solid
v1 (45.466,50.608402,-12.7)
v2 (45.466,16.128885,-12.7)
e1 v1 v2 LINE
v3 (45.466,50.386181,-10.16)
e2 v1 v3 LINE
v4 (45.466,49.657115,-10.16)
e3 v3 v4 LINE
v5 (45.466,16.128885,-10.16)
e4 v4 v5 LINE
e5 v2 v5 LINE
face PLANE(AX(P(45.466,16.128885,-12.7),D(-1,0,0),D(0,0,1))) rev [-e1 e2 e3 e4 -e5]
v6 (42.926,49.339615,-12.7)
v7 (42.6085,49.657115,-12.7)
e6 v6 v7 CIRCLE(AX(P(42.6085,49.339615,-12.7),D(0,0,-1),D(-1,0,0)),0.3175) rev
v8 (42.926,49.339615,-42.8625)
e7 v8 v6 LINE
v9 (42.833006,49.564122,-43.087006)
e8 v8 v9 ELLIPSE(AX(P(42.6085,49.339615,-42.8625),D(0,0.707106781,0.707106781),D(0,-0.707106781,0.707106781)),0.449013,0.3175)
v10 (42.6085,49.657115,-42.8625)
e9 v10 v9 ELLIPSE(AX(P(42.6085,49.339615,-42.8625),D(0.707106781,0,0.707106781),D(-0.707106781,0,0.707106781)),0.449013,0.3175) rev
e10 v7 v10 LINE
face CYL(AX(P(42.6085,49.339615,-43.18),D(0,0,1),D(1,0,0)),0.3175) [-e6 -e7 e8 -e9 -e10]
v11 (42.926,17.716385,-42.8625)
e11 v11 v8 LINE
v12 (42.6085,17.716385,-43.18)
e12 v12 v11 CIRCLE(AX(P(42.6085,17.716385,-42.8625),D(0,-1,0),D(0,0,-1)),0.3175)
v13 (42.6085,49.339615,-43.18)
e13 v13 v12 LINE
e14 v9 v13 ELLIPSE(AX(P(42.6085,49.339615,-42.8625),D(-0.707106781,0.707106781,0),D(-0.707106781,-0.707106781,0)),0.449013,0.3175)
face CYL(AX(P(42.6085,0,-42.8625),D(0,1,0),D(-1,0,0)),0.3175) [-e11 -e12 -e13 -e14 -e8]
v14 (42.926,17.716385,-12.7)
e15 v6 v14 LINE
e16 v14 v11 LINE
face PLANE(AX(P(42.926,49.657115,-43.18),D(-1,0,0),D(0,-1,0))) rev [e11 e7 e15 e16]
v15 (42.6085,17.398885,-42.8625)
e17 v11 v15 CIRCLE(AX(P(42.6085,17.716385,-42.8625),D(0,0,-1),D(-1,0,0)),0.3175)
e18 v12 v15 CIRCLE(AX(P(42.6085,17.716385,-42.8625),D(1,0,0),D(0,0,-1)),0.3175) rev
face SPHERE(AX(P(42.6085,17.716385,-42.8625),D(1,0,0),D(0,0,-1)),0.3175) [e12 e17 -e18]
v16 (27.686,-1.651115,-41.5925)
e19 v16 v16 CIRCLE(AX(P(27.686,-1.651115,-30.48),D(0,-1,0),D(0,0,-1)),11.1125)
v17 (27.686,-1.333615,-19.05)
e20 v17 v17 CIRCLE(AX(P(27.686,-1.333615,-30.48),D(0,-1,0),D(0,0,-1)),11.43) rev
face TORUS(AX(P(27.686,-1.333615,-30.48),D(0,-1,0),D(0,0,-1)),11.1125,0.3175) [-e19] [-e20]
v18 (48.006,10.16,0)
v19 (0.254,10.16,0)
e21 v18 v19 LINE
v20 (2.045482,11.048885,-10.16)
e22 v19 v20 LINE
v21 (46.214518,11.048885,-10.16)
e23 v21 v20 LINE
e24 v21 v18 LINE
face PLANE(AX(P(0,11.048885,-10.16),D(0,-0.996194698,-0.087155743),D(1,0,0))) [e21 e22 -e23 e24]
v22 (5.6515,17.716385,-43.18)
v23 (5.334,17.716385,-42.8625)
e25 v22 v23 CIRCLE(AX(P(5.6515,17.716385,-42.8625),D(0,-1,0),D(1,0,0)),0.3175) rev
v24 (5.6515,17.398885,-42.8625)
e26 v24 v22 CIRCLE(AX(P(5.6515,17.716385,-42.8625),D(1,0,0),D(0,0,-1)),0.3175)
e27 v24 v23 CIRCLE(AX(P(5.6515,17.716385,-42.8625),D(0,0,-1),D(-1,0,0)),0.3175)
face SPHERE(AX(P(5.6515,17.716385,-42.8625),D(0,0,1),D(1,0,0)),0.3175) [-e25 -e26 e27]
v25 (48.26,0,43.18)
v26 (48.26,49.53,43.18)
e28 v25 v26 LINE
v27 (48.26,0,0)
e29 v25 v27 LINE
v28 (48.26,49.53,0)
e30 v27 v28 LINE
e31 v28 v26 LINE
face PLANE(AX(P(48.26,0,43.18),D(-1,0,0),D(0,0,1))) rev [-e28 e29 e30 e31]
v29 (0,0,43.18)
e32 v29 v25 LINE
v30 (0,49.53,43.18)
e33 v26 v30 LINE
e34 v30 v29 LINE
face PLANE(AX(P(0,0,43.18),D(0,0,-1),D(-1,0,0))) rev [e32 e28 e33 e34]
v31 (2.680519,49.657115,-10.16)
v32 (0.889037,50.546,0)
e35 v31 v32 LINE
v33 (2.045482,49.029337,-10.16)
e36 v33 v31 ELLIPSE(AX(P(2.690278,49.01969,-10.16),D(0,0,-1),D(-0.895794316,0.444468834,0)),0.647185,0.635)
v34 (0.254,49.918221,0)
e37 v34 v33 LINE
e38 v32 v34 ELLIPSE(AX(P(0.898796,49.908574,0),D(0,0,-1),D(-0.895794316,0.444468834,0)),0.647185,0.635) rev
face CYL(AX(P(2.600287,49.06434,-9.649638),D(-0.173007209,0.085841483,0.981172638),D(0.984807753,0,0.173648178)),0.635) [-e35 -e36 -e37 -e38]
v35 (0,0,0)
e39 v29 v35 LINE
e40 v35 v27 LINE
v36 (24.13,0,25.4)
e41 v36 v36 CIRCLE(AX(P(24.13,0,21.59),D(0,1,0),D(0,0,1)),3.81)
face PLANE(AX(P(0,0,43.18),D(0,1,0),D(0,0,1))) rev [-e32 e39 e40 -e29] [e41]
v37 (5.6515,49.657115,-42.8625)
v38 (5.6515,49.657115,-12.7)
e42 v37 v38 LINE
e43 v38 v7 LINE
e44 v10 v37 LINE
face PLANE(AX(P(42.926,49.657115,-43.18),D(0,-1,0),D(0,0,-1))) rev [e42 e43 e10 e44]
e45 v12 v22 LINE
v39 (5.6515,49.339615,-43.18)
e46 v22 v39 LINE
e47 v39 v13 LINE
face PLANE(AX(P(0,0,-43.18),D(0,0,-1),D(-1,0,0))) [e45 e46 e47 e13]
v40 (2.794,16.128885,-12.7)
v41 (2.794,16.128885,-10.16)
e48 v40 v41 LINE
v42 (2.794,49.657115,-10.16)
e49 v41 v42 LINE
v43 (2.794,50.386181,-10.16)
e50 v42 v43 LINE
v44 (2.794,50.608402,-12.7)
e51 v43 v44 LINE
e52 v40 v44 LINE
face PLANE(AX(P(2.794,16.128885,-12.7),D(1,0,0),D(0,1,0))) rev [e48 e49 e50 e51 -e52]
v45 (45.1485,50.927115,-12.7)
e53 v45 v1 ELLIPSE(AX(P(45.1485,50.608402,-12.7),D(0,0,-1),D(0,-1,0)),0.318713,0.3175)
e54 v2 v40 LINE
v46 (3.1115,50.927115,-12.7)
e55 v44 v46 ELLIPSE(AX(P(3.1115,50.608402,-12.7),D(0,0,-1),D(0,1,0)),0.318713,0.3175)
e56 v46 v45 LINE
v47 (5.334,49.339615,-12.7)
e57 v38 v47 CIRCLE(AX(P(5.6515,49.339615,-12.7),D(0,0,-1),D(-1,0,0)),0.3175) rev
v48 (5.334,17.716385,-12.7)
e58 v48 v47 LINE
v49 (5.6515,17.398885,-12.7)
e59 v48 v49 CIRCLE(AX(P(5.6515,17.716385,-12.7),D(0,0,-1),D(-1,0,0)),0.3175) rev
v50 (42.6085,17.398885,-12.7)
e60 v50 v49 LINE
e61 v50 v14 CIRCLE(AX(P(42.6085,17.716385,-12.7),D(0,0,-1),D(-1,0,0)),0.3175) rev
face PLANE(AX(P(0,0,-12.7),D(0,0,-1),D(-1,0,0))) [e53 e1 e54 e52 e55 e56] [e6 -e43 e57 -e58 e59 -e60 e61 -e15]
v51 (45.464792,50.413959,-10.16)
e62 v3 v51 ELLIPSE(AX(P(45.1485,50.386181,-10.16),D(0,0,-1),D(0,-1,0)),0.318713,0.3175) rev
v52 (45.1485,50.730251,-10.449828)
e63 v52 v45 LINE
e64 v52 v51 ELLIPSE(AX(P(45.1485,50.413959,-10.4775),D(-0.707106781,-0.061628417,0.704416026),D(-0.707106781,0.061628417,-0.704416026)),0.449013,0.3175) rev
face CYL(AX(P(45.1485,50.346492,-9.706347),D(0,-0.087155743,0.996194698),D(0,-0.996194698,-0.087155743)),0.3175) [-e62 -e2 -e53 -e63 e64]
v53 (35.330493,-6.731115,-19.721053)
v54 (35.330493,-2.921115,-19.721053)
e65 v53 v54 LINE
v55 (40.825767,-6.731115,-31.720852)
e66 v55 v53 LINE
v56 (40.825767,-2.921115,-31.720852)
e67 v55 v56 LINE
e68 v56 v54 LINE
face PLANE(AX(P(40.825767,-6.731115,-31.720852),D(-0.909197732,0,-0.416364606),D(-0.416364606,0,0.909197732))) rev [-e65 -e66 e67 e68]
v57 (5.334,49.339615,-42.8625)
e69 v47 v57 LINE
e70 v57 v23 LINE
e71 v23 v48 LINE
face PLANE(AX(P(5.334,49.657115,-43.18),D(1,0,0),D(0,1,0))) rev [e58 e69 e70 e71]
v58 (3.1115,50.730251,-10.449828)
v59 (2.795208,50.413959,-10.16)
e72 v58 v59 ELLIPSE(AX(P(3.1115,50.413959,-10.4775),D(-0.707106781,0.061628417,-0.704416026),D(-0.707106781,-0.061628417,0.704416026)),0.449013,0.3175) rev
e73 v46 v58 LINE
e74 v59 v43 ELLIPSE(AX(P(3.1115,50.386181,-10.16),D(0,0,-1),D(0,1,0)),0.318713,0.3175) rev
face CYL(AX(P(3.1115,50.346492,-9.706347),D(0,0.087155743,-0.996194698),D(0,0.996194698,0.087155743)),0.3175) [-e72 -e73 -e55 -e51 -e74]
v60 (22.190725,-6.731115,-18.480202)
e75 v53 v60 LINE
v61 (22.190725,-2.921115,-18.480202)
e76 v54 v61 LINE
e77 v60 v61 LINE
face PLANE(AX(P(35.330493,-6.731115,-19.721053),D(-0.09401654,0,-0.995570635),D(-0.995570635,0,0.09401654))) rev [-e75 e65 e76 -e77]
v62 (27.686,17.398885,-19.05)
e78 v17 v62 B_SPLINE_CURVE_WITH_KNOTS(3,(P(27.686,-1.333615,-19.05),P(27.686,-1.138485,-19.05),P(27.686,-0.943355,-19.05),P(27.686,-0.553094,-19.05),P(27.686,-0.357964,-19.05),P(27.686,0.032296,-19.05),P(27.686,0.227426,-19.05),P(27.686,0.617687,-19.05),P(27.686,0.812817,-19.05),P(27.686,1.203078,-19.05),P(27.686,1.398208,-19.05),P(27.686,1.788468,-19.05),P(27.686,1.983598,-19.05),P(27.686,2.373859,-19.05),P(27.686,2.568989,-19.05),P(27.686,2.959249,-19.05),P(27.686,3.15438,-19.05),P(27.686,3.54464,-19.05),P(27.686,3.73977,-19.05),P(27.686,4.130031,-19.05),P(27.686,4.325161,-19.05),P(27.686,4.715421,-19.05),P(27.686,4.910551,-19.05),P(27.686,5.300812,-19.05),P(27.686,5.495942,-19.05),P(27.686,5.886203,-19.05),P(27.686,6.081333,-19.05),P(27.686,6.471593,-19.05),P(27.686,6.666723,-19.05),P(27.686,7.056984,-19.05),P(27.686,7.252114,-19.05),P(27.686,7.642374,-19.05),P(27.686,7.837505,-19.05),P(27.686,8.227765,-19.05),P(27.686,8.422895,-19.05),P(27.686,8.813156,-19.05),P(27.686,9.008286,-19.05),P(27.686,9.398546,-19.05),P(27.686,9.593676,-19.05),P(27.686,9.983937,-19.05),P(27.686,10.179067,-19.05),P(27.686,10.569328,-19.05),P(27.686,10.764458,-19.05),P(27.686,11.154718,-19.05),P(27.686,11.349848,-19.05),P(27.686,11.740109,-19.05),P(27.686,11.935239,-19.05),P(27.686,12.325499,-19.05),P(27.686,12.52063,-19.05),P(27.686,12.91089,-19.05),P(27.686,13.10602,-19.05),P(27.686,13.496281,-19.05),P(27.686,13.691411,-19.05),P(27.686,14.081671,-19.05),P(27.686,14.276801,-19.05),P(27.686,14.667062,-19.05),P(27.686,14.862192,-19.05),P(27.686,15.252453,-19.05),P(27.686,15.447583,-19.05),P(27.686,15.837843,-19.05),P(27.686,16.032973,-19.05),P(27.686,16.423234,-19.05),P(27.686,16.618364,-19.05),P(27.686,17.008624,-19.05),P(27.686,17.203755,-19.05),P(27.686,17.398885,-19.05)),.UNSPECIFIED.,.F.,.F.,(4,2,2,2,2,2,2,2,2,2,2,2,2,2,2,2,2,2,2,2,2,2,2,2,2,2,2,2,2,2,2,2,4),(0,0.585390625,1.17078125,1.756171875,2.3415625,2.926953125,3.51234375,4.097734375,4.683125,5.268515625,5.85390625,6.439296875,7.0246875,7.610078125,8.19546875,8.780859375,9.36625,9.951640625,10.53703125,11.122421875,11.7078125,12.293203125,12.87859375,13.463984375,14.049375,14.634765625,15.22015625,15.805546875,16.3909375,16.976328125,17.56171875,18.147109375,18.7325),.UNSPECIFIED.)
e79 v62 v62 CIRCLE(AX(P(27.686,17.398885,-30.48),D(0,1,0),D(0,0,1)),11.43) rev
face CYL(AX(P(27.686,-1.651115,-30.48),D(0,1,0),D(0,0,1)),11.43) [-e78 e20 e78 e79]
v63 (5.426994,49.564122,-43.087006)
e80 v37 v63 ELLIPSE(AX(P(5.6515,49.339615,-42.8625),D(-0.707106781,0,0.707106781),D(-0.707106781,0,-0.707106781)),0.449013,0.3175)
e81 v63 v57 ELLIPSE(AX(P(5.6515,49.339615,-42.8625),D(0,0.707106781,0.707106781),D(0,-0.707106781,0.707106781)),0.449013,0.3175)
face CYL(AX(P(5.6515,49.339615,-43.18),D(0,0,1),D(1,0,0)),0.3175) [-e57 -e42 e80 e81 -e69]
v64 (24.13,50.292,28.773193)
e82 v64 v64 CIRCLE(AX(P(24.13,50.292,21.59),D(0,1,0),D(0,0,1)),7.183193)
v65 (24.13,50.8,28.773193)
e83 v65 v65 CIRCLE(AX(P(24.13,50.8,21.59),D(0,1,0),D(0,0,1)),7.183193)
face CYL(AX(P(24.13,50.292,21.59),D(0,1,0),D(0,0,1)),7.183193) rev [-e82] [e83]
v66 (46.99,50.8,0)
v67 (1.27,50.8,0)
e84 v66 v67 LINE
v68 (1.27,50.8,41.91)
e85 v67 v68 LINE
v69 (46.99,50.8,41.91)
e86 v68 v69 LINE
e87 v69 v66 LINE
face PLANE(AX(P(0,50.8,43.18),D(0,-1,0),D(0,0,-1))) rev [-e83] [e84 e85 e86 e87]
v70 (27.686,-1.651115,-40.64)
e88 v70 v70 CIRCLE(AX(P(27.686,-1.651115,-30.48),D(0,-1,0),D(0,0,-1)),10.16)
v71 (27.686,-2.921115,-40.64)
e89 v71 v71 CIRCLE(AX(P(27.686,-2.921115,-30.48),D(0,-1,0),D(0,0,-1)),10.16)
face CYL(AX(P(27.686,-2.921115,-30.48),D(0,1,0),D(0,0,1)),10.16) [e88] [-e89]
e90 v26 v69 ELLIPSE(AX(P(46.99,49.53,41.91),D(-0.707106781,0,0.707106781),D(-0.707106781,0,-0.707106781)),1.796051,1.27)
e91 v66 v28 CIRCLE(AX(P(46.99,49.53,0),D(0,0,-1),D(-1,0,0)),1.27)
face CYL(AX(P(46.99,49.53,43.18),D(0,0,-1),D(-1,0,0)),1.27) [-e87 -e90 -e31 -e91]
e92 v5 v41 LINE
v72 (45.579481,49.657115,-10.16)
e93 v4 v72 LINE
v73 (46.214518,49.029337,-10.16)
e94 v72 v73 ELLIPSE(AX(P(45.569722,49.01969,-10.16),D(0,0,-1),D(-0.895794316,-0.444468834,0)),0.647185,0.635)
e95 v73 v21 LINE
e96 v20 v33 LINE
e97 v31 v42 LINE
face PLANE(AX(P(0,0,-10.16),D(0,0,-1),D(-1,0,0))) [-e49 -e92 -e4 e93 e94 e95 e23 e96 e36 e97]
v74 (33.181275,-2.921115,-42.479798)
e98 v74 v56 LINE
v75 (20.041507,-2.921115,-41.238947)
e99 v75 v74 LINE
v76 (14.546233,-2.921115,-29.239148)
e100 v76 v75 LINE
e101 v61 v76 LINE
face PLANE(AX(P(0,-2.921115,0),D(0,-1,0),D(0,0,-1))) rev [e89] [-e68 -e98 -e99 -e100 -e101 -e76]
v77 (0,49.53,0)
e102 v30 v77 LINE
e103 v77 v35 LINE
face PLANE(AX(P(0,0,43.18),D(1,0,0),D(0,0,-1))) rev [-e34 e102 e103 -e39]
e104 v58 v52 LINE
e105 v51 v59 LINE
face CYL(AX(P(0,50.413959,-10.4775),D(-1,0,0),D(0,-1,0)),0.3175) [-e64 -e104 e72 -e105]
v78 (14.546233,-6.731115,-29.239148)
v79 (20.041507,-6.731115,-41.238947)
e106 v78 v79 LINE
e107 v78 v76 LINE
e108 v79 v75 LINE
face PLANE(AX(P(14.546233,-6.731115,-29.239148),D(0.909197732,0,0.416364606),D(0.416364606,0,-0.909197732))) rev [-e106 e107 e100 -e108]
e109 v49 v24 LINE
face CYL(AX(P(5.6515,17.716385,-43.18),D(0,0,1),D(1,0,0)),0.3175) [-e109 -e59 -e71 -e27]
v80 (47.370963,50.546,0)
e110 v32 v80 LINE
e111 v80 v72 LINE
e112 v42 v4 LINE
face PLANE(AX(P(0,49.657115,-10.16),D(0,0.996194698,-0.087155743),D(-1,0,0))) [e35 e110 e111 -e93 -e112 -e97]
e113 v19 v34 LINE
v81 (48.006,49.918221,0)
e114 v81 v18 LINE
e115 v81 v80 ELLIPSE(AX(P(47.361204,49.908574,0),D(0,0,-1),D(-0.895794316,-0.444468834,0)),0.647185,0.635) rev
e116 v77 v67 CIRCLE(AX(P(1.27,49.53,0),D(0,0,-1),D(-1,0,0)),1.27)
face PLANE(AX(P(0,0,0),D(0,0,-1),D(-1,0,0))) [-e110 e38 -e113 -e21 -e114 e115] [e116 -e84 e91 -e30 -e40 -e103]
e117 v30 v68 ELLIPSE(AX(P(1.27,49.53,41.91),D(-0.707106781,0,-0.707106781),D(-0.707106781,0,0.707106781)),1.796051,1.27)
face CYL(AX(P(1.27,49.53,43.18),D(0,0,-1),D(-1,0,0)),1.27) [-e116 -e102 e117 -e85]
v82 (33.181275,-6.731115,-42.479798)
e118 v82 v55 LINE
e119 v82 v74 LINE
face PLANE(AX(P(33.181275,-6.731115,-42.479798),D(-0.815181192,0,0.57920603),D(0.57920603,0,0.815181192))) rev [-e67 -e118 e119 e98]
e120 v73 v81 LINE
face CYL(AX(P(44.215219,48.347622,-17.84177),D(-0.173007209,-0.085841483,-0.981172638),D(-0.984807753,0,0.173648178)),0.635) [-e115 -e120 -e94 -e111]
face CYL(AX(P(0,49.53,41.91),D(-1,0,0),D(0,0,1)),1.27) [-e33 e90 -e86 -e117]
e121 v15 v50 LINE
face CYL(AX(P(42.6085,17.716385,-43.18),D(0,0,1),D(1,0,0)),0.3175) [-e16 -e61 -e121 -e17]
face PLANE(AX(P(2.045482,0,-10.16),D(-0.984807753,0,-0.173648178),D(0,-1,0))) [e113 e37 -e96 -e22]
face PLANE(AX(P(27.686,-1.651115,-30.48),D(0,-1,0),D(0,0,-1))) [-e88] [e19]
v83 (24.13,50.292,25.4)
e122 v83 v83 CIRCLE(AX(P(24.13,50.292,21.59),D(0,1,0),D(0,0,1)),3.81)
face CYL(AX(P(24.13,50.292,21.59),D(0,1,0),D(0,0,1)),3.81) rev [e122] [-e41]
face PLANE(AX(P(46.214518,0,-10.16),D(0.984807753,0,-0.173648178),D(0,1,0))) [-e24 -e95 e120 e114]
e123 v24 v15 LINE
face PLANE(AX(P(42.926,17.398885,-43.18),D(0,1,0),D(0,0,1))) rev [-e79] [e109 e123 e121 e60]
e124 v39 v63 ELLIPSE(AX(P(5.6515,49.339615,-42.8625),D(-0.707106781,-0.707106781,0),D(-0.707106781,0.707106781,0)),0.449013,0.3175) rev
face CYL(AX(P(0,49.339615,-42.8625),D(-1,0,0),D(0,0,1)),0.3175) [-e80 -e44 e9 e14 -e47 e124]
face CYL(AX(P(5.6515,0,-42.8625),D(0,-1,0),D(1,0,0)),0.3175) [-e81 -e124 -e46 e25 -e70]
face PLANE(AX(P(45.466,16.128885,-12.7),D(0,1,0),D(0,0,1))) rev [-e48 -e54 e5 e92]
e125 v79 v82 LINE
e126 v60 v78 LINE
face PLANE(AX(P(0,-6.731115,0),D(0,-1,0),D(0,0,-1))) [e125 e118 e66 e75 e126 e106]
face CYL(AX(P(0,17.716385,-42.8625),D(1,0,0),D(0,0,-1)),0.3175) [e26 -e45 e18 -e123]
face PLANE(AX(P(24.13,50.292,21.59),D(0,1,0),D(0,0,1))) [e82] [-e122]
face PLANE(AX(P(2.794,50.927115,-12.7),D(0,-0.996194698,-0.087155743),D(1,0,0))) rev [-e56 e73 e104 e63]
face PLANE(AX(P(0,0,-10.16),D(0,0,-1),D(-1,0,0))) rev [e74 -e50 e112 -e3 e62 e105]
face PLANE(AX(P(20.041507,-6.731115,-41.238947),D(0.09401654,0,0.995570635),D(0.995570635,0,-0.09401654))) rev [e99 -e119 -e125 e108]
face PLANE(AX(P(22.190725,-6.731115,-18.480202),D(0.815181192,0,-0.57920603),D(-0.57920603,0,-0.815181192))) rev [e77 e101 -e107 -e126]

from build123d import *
from OCP.BRepFilletAPI import BRepFilletAPI_MakeChamfer

# Parameters (mm, degrees)
SKETCH2_W                   = 48.26
SKETCH2_H                   = 50.8
BOSS_EXTRUDE1_DEPTH         = 43.18
FILLET1_R                   = 1.27
BOSS_EXTRUDE2_DEPTH         = 10.16
CHAMFER1_SIZE               = 10.16
CHAMFER1_SIZE_2             = 0.888884821
SKETCH4_R                   = 7.183192936
CUT_EXTRUDE1_DEPTH          = 0.508
CHAMFER4_SIZE               = 1.791482124
CHAMFER4_SIZE_2             = 10.16
SKETCH6_W                   = 42.672
SKETCH6_H                   = 34.798230358
BOSS_EXTRUDE3_DEPTH         = 2.54
CHAMFER2_SIZE2              = 2.54
CHAMFER2_SIZE               = 0.222221205
FILLET4_R                   = 0.3175
SKETCH8_W                   = 37.592
SKETCH8_H                   = 32.258230358
BOSS_EXTRUDE4_DEPTH         = 30.48
FILLET5_R                   = 0.3175
FILLET6_R                   = 0.3175
FILLET7_R                   = 0.3175
SKETCH10_R                  = 11.43
BOSS_EXTRUDE5_DEPTH         = 19.05
SKETCH11_R                  = 10.16
BOSS_EXTRUDE6_DEPTH         = 1.27
BOSS_EXTRUDE7_DEPTH         = 3.81
FILLET8_R                   = 0.3175
FILLET2_R                   = 0.635
F_3_64_0_3_DIAMETER_HOLE1_D = 7.62


# Some blends are built 0.0001 mm under size
with BuildPart() as part:
    # Sketch2 → Boss-Extrude1 (new body)
    with BuildSketch(Plane.XY):
        with Locations((24.13, 25.4)):
            Rectangle(SKETCH2_W, SKETCH2_H)
    extrude(amount=BOSS_EXTRUDE1_DEPTH)

    # Fillet1
    fillet1_edges = [part.edges().sort_by_distance(p)[0] for p in [
        (24.13, 50.8, 43.18),
        (0, 50.8, 21.59),
        (48.26, 50.8, 21.59),
    ]]
    fillet(fillet1_edges, radius=FILLET1_R)

    # Sketch3 → Boss-Extrude2 (add)
    with BuildSketch(Plane(origin=(0, 0, 0), x_dir=(-1, 0, 0), z_dir=(0, 0, -1))):
        Polygon((-45.466, 50.546), (-2.794, 50.546), (-0.254, 50.546), (-0.254, 48.006), (-0.254, 10.16), (-48.006, 10.16), (-48.006, 48.006), (-48.006, 50.546), align=None)
    extrude(amount=BOSS_EXTRUDE2_DEPTH)

    # Chamfer1
    chamfer1_edges_1 = [part.edges().sort_by_distance(p)[0] for p in [
        (24.13, 50.546, -10.16),
    ]]
    chamfer1_side_1 = [part.faces().sort_by_distance(p)[0] for p in [
        (24.13, 50.546, -10.142222304),
    ]]
    chamfer1_edges_2 = [part.edges().sort_by_distance(p)[0] for p in [
        (24.13, 10.16, -10.16),
    ]]
    chamfer1_side_2 = [part.faces().sort_by_distance(p)[0] for p in [
        (24.13, 10.16, -10.142222304),
    ]]
    chamfer1 = BRepFilletAPI_MakeChamfer(part.part.solid().wrapped)
    for e in chamfer1_edges_1:
        chamfer1.Add(CHAMFER1_SIZE - 0.0001, CHAMFER1_SIZE_2 - 0.0001, e.wrapped, chamfer1_side_1[0].wrapped)
    for e in chamfer1_edges_2:
        chamfer1.Add(CHAMFER1_SIZE - 0.0001, CHAMFER1_SIZE_2 - 0.0001, e.wrapped, chamfer1_side_2[0].wrapped)
    add(Compound.cast(chamfer1.Shape()), mode=Mode.REPLACE)  # a hair under: the kernel refuses the full size

    # Sketch4 → Cut-Extrude1 (cut)
    with BuildSketch(Plane(origin=(0, 50.8, 0), x_dir=(1, 0, 0), z_dir=(0, 1, 0))):
        with Locations(Location((24.13, -21.59, 0), (0, 0, 270))):
            Circle(SKETCH4_R)
    extrude(amount=-CUT_EXTRUDE1_DEPTH, mode=Mode.SUBTRACT)

    # Chamfer4
    chamfer4_edges_1 = [part.edges().sort_by_distance(p)[0] for p in [
        (48.006, 30.353, -10.16),
    ]]
    chamfer4_side_1 = [part.faces().sort_by_distance(p)[0] for p in [
        (47.970170358, 30.353, -10.16),
    ]]
    chamfer4_edges_2 = [part.edges().sort_by_distance(p)[0] for p in [
        (0.254, 30.353, -10.16),
    ]]
    chamfer4_side_2 = [part.faces().sort_by_distance(p)[0] for p in [
        (0.254, 30.353, -10.124170358),
    ]]
    chamfer4 = BRepFilletAPI_MakeChamfer(part.part.solid().wrapped)
    for e in chamfer4_edges_1:
        chamfer4.Add(CHAMFER4_SIZE - 0.0001, CHAMFER4_SIZE_2 - 0.0001, e.wrapped, chamfer4_side_1[0].wrapped)
    for e in chamfer4_edges_2:
        chamfer4.Add(CHAMFER4_SIZE_2 - 0.0001, CHAMFER4_SIZE - 0.0001, e.wrapped, chamfer4_side_2[0].wrapped)
    add(Compound.cast(chamfer4.Shape()), mode=Mode.REPLACE)  # a hair under: the kernel refuses the full size

    # Sketch6 → Boss-Extrude3 (add)
    with BuildSketch(Plane(origin=(0, 0, -10.16), x_dir=(-1, 0, 0), z_dir=(0, 0, -1))):
        with Locations((-24.13, 33.528)):
            Rectangle(SKETCH6_W, SKETCH6_H)
    extrude(amount=BOSS_EXTRUDE3_DEPTH)

    # Chamfer2
    chamfer2_edges = [part.edges().sort_by_distance(p)[0] for p in [
        (24.13, 50.927115179, -10.16),
    ]]
    chamfer2_side = [part.faces().sort_by_distance(p)[0] for p in [
        (24.13, 50.922670754, -10.16),
    ]]
    chamfer(chamfer2_edges, length=CHAMFER2_SIZE - 0.0001, length2=CHAMFER2_SIZE2 - 0.0001, reference=chamfer2_side[0])  # a hair under: the kernel refuses the full size

    # Fillet4
    # the kernel refuses this fillet: 0.3175 mm, written as the material it takes off along each edge
    with BuildSketch(Plane(origin=(45.466, 50.635842296, -9.369267992), x_dir=(-1, 0, 0), z_dir=(0, 0.08712022396653547, -0.9961978049443899)), Plane(origin=(2.794, 50.635842296, -9.369267992), x_dir=(0, -0.9961978049443899, -0.08712022396653547), z_dir=(0, 0.08712022396653547, -0.9961978049443899))) as fillet4_piece_1:
        with BuildLine():
            CenterArc((FILLET4_R, -FILLET4_R), FILLET4_R, 90, 90)
            Line((0, -FILLET4_R), (0, 0))
            Line((0, 0), (FILLET4_R, 0))
        make_face()
    extrude(amount=4.137094054, mode=Mode.SUBTRACT)
    with BuildSketch(Plane(origin=(46.193363902, 50.704993974, -10.16), x_dir=(0, -1, 0), z_dir=(-1, 0, 0))) as fillet4_piece_2:
        with BuildLine():
            CenterArc((FILLET4_R * 0.916363970592, -FILLET4_R), FILLET4_R, 90, 85.002042847)
            Line((-FILLET4_R * 0.0798338343528, -FILLET4_R * 0.912879776033), (0, 0))
            Line((0, 0), (FILLET4_R * 0.916363970592, 0))
        make_face()
    extrude(amount=44.126727803, mode=Mode.SUBTRACT)

    # Sketch8 → Boss-Extrude4 (add)
    with BuildSketch(Plane(origin=(0, 0, -12.7), x_dir=(-1, 0, 0), z_dir=(0, 0, -1))):
        with Locations((-24.13, 33.528)):
            Rectangle(SKETCH8_W, SKETCH8_H)
    extrude(amount=BOSS_EXTRUDE4_DEPTH)

    # Fillet5
    fillet5_edges = [part.edges().sort_by_distance(p)[0] for p in [
        (42.926, 49.657115179, -27.94),
        (5.334, 49.657115179, -27.94),
        (24.13, 49.657115179, -43.18),
    ]]
    fillet(fillet5_edges, radius=FILLET5_R)

    # Fillet6
    # the kernel refuses this fillet: 0.3175 mm, written as the material it takes off along each edge
    with BuildSketch(Plane(origin=(42.6085, 17.716384821, -42.8625), x_dir=(0, -1, 0), z_dir=(1, 0, 0))) as fillet6_piece_1_section:
        Polygon((0, 0), (FILLET6_R * 1.02, 0), (FILLET6_R * 1.02, FILLET6_R * 1.02), (0, FILLET6_R * 1.02), align=None)
    fillet6_piece_1 = extrude(amount=FILLET6_R * 1.02, mode=Mode.PRIVATE)
    fillet6_piece_1 = fillet6_piece_1 - Plane(origin=(42.6085, 17.716384821, -42.8625), x_dir=(0, 0.7071067811865475, 0.7071067811865475), z_dir=(1, 0, 0)) * Sphere(FILLET6_R, mode=Mode.PRIVATE)
    add(fillet6_piece_1, mode=Mode.SUBTRACT)
    with BuildSketch(Plane(origin=(42.926, 17.398884821, -12.7), x_dir=(0, 1, 0), z_dir=(0, 0, -1))) as fillet6_piece_2:
        with BuildLine():
            CenterArc((FILLET6_R, -FILLET6_R), FILLET6_R, 90, 90)
            Line((0, -FILLET6_R), (0, 0))
            Line((0, 0), (FILLET6_R, 0))
        make_face()
    extrude(amount=30.1625, mode=Mode.SUBTRACT)
    with BuildSketch(Plane(origin=(4.54025, 17.398884821, -43.18), x_dir=(0, 0, 1), z_dir=(1, 0, 0))) as fillet6_piece_3:
        with BuildLine():
            CenterArc((FILLET6_R, -FILLET6_R), FILLET6_R, 90, 90)
            Line((0, -FILLET6_R), (0, 0))
            Line((0, 0), (FILLET6_R, 0))
        make_face()
    extrude(amount=38.06825, mode=Mode.SUBTRACT)
    with BuildSketch(Plane(origin=(5.334, 50.133365179, -43.18), x_dir=(0, 0, 1), z_dir=(0, -1, 0))) as fillet6_piece_4:
        with BuildLine():
            CenterArc((FILLET6_R, -FILLET6_R), FILLET6_R, 90, 90)
            Line((0, -FILLET6_R), (0, 0))
            Line((0, 0), (FILLET6_R, 0))
        make_face()
    extrude(amount=33.528230357, mode=Mode.SUBTRACT)
    with BuildSketch(Plane(origin=(42.926, 17.716384821, -43.18), x_dir=(0, 0, 1), z_dir=(0, 1, 0))) as fillet6_piece_5:
        with BuildLine():
            CenterArc((FILLET6_R, -FILLET6_R), FILLET6_R, 90, 90)
            Line((0, -FILLET6_R), (0, 0))
            Line((0, 0), (FILLET6_R, 0))
        make_face()
    extrude(amount=32.416980357, mode=Mode.SUBTRACT)

    # Fillet7
    # the kernel refuses this fillet: 0.3175 mm, written as the material it takes off along each edge
    with BuildSketch(Plane(origin=(5.6515, 17.716384821, -42.8625), x_dir=(-1, 0, 0), z_dir=(0, -1, 0))) as fillet7_piece_1_section:
        Polygon((0, 0), (FILLET7_R, 0), (FILLET7_R, FILLET7_R), (0, FILLET7_R), align=None)
    fillet7_piece_1 = extrude(amount=FILLET7_R, mode=Mode.PRIVATE)
    fillet7_piece_1 = fillet7_piece_1 - Plane(origin=(5.6515, 17.716384821, -42.8625), x_dir=(0.7071067811865475, 0, 0.7071067811865475), z_dir=(0, -1, 0)) * Sphere(FILLET7_R, mode=Mode.PRIVATE)
    add(fillet7_piece_1, mode=Mode.SUBTRACT)
    with BuildSketch(Plane(origin=(5.334, 17.398884821, -12.7), x_dir=(1, 0, 0), z_dir=(0, 0, -1))) as fillet7_piece_2:
        with BuildLine():
            CenterArc((FILLET7_R, -FILLET7_R), FILLET7_R, 90, 90)
            Line((0, -FILLET7_R), (0, 0))
            Line((0, 0), (FILLET7_R, 0))
        make_face()
    extrude(amount=30.1625, mode=Mode.SUBTRACT)

    # Sketch10 → Boss-Extrude5 (add)
    with BuildSketch(Plane.XZ.offset(-17.398884821)):
        with Locations(Location((27.686, -30.48, 0), (0, 0, 90))):
            Circle(SKETCH10_R)
    extrude(amount=BOSS_EXTRUDE5_DEPTH)

    # Sketch11 → Boss-Extrude6 (add)
    with BuildSketch(Plane.XZ.offset(1.651115179)):
        with Locations(Location((27.686, -30.48, 0), (0, 0, 270))):
            Circle(SKETCH11_R)
    extrude(amount=BOSS_EXTRUDE6_DEPTH)

    # Sketch12 → Boss-Extrude7 (add)
    with BuildSketch(Plane.XZ.offset(2.921115179)):
        Polygon((33.181274645, -42.479798189), (40.825767394, -31.720851652), (35.33049275, -19.721053462), (22.190725355, -18.480201811), (14.546232606, -29.239148348), (20.04150725, -41.238946538), align=None)
    extrude(amount=BOSS_EXTRUDE7_DEPTH)

    # Fillet8
    fillet8_edges = [part.edges().sort_by_distance(p)[0] for p in [
        (27.686, -1.651115179, -41.91),
    ]]
    fillet(fillet8_edges, radius=FILLET8_R)

    # Fillet2
    # the kernel refuses this fillet: 0.635 mm, written as the material it takes off along each edge
    with BuildSketch(Plane(origin=(45.944105867, 49.523002068, -11.694220381), x_dir=(0.01490405395374314, -0.9963095509323676, 0.08452897666887954), z_dir=(0.17299962328390456, 0.08583285338927087, 0.9811747304240377))) as fillet2_piece_1_section:
        with BuildLine():
            CenterArc((FILLET2_R * 0.984980559667, -FILLET2_R), FILLET2_R, 90, 89.132954612)
            Line((-FILLET2_R * 0.0149049417488, -FILLET2_R * 0.984867780788), (0, 0))
            Line((0, 0), (FILLET2_R * 0.984980559667, 0))
        make_face()
    fillet2_piece_1 = extrude(amount=13.48214579, mode=Mode.PRIVATE)
    fillet2_piece_1 = split(fillet2_piece_1, bisect_by=Plane(origin=(46.959597239, 49.956662585, -10.16), z_dir=(0, 0, 1)), keep=Keep.TOP, mode=Mode.PRIVATE)
    fillet2_piece_1 = split(fillet2_piece_1, bisect_by=Plane(origin=(46.959597239, 49.956662585, 0), z_dir=(0, 0, -1)), keep=Keep.TOP, mode=Mode.PRIVATE)
    add(fillet2_piece_1, mode=Mode.SUBTRACT)
    with BuildSketch(Plane(origin=(-0.016512009, 50.680213111, 1.534120381), x_dir=(-0.014904053953745064, -0.9963095509323676, 0.0845289766688792), z_dir=(0.17299962328390434, -0.08583285338927088, -0.9811747304240378))) as fillet2_piece_2_section:
        with BuildLine():
            CenterArc((FILLET2_R * 0.984980559667, -FILLET2_R), FILLET2_R, 90, 89.132954612)
            Line((-FILLET2_R * 0.0149049417488, -FILLET2_R * 0.984867780788), (0, 0))
            Line((0, 0), (FILLET2_R * 0.984980559667, 0))
        make_face()
    fillet2_piece_2 = extrude(amount=13.48214579, mode=Mode.PRIVATE)
    fillet2_piece_2 = split(fillet2_piece_2, bisect_by=Plane(origin=(0.354174002, 50.466816982, -10.16), z_dir=(0, 0, 1)), keep=Keep.TOP, mode=Mode.PRIVATE)
    fillet2_piece_2 = split(fillet2_piece_2, bisect_by=Plane(origin=(0.354174002, 50.466816982, 0), z_dir=(0, 0, -1)), keep=Keep.TOP, mode=Mode.PRIVATE)
    add(fillet2_piece_2, mode=Mode.SUBTRACT)

    # 3/64 (0.3) Diameter Hole1 (through all)
    with Locations(Plane(origin=(0, 50.292, 0), x_dir=(1, 0, 0), z_dir=(0, 1, 0))):
        with Locations((24.13, -21.59)):
            Hole(F_3_64_0_3_DIAMETER_HOLE1_D / 2)


solid = part.part
